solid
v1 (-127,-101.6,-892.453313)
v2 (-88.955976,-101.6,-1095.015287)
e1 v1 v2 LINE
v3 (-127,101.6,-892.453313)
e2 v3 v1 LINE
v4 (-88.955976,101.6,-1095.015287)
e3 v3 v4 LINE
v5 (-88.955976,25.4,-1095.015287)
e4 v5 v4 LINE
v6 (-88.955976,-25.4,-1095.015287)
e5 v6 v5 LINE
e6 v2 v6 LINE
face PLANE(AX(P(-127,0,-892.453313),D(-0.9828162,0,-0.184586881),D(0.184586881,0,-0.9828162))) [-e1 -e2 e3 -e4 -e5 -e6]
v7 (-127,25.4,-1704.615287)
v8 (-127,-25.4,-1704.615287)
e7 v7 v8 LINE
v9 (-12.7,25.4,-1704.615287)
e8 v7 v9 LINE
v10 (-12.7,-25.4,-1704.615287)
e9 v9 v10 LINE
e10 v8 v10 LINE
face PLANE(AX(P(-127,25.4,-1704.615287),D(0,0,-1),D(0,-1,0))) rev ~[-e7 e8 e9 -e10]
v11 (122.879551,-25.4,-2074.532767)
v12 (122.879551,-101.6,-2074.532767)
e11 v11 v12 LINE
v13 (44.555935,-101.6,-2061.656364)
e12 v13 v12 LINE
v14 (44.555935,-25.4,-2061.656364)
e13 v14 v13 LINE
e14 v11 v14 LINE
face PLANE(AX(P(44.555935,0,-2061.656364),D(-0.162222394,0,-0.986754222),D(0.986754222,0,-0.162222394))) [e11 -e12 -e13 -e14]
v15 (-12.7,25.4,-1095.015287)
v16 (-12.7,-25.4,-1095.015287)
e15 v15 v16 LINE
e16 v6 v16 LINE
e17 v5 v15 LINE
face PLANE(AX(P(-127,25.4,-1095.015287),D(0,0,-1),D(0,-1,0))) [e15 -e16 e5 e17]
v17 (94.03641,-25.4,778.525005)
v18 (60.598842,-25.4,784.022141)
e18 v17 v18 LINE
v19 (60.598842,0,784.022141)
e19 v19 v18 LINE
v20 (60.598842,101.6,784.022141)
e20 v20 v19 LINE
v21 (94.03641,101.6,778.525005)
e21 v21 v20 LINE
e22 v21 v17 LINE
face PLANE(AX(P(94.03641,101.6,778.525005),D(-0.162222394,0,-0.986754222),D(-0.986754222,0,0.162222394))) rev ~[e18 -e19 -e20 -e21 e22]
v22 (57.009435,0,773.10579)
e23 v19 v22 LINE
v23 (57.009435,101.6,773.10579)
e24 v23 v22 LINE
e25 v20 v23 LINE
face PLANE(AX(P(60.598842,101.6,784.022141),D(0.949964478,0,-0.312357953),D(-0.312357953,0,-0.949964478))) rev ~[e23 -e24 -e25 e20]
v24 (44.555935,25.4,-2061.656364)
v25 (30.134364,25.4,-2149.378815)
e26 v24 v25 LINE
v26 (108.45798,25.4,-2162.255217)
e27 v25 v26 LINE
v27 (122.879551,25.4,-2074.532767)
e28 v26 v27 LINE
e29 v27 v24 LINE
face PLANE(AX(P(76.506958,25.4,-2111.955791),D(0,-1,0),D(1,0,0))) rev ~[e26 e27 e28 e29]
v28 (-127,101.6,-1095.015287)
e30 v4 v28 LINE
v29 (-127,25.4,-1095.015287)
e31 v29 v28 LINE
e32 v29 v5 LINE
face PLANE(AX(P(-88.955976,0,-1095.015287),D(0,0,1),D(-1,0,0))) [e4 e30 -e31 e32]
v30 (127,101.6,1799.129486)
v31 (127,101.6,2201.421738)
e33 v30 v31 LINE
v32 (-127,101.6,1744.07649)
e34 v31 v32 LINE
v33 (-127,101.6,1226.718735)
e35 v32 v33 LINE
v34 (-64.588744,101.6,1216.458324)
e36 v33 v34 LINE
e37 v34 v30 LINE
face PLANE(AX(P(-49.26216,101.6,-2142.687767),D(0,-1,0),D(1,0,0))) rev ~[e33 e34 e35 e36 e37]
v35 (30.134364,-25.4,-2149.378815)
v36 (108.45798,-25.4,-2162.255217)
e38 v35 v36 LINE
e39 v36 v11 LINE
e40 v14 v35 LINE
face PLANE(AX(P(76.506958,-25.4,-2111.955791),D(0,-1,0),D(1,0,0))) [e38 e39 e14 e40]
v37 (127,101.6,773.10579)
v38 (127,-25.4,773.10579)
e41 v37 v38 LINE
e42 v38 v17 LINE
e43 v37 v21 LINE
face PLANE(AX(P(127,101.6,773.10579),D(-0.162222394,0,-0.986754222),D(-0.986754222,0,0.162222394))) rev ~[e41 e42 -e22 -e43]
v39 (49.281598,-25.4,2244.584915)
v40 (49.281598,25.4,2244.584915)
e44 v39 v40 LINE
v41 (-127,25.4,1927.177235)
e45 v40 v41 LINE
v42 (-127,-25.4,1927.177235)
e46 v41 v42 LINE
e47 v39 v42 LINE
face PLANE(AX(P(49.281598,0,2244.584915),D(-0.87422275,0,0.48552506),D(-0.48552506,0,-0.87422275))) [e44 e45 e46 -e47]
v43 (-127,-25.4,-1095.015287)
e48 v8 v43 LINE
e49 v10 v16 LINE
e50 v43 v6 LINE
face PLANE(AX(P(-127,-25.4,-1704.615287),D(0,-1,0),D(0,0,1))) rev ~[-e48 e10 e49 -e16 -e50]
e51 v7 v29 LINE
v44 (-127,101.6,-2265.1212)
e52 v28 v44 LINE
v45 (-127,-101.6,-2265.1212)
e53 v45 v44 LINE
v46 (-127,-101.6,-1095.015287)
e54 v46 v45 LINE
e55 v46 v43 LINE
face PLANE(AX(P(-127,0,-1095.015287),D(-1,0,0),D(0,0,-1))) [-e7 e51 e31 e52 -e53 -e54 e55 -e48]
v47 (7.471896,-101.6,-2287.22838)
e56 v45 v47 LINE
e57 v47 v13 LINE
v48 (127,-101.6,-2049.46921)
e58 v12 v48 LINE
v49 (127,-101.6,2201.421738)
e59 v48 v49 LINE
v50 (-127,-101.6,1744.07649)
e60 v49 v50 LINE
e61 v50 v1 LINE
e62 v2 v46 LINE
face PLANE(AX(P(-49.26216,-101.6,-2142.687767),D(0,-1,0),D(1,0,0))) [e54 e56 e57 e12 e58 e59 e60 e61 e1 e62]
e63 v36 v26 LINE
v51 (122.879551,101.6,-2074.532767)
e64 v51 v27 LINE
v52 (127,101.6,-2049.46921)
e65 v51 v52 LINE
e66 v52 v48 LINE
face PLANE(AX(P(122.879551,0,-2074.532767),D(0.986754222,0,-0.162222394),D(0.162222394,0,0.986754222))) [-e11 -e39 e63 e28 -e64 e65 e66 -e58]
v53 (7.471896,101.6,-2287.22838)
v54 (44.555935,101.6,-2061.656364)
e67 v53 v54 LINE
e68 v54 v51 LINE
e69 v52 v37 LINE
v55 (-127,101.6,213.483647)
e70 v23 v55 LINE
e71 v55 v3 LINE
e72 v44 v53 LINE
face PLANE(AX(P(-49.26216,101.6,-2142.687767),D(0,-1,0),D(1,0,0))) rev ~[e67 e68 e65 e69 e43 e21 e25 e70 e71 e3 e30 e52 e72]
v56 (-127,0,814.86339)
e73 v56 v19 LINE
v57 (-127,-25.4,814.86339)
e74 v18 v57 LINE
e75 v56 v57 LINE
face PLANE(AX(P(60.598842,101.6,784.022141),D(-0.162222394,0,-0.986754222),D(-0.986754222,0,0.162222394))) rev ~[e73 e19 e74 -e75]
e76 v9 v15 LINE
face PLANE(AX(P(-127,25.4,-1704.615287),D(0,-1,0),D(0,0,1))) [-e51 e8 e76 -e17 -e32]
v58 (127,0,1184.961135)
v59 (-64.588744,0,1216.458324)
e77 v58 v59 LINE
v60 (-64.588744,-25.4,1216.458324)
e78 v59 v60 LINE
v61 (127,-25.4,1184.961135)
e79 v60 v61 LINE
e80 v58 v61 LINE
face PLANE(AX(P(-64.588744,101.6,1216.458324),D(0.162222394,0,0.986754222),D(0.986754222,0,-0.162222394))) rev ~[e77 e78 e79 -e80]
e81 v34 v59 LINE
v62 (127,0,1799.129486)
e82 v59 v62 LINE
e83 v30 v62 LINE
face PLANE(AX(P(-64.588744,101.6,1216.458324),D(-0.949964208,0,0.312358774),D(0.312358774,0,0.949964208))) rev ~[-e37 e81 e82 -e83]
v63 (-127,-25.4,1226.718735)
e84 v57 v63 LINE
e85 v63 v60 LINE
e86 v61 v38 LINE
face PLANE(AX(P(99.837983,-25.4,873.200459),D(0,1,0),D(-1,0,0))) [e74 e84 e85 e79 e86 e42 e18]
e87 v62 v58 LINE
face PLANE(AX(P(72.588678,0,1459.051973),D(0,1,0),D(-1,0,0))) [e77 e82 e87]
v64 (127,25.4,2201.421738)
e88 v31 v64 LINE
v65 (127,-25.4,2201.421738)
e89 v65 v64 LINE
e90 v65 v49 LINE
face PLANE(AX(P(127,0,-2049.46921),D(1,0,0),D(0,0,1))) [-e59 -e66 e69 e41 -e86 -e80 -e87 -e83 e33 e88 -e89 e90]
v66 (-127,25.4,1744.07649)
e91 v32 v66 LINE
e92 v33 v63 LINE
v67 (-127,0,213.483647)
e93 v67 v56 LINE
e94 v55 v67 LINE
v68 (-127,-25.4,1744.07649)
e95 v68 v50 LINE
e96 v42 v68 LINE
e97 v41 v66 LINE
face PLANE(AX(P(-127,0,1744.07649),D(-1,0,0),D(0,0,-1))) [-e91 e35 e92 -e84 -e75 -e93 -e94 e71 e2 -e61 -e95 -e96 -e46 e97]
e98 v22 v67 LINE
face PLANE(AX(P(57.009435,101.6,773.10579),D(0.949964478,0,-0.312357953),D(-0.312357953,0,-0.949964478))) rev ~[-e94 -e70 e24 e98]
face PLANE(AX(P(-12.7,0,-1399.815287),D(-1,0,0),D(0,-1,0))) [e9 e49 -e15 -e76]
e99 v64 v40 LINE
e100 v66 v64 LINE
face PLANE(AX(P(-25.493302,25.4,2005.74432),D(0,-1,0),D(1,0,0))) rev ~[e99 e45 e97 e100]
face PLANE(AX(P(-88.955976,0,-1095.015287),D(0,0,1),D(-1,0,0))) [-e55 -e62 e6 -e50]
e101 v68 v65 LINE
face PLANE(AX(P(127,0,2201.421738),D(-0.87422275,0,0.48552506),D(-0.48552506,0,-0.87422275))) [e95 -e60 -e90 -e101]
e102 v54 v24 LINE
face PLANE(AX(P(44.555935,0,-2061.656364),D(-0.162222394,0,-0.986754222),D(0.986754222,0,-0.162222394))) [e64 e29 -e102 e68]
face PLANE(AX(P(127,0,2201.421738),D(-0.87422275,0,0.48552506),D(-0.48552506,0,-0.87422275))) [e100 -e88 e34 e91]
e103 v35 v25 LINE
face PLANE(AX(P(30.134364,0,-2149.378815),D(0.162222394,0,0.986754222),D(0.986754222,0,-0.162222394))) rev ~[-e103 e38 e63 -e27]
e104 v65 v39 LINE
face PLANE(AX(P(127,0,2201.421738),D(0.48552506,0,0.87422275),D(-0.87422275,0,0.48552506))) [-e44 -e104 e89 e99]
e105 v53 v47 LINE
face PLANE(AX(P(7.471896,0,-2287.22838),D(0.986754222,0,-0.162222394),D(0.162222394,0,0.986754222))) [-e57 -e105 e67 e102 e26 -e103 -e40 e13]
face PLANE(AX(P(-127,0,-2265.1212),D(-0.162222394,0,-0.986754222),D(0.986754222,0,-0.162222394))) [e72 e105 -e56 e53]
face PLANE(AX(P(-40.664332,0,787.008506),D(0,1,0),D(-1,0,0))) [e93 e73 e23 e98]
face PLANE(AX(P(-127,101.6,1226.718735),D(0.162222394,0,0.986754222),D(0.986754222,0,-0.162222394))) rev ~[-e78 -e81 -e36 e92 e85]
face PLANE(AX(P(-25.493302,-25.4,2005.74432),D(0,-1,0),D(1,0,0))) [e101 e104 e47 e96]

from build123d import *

# Parameters (mm, degrees)
F1_DEPTH = 101.6
F2_DEPTH = 25.4
F4_DEPTH = 127
F5_DEPTH = 101.6
F6_W     = 50.8
F6_H     = 609.6
F7_DEPTH = 114.3


# Not quite as in the source:
# - a feature names something its author has since deleted; it is built from what else it names


with BuildPart() as f1:
    # F0 (on Front) → F1 (new body, symmetric)
    with BuildSketch(Plane.XZ):
        Polygon((48.6763836202, -2036.5928072073), (-127, -2007.7116097401), (-127, -2265.1212), (7.4718955151, -2287.2283796227), (30.1343639729, -2149.3788147942), (44.5559348097, -2061.6563644488), align=None)
        Polygon((122.8795511895, -2074.5327669817), (127, -2049.4692097401), (48.6763836202, -2036.5928072073), (44.5559348097, -2061.6563644488), align=None)
        Polygon((127, -2049.4692097401), (127, -1560.1717829992), (48.6763836202, -2036.5928072073), align=None)
        Polygon((127, 2201.4217376709), (-127, 1744.0764904022), (-127, -892.4533128738), (-88.955976069, -1095.0152873993), (-127, -1095.0152873993), (-127, -2007.7116097401), (48.6763836202, -2036.5928072073), (127, -1560.1717829992), (127, 1433.3240232688), align=None)
    extrude(amount=F1_DEPTH, both=True)

    # F0 (on Front) → F2 (join, symmetric)
    with BuildSketch(Plane.XZ):
        Polygon((108.4579803527, -2162.2552173271), (122.8795511895, -2074.5327669817), (44.5559348097, -2061.6563644488), (30.1343639729, -2149.3788147942), align=None)
        Polygon((49.2815975347, 2244.584915476), (-127, 1927.1772351083), (-127, 1744.0764904022), (127, 2201.4217376709), align=None)
    extrude(amount=F2_DEPTH, both=True)

    # F3 (on face) → F4 (cut)
    with BuildSketch(Plane(origin=(0, 101.6, 0), x_dir=(-1, 0, 0), z_dir=(0, 1, 0))):
        Polygon((-127, 979.0334624678), (-94.0364095159, 778.5250045355), (-60.5988418361, 784.022140662), (-124.8374418386, 979.3889870295), align=None)
        Polygon((-127, 979.0334624678), (-127, 773.1057902599), (-94.0364095159, 778.5250045355), align=None)
        Polygon((-124.8374418386, 979.3889870295), (-60.5988418361, 784.022140662), (127, 814.8633902599), (127, 1020.7910624678), align=None)
        Polygon((64.588744063, 1216.4583241996), (127, 1026.6494750977), (127, 1226.7187346757), align=None)
        Polygon((-127, 985.9659075737), (-127, 979.0334624678), (-124.8374418386, 979.3889870295), align=None)
        Polygon((-127, 985.9659075737), (-124.8374418386, 979.3889870295), (127, 1020.7910624678), (127, 1026.6494750977), (64.588744063, 1216.4583241996), (-127, 1184.9611346757), align=None)
    extrude(amount=-F4_DEPTH, mode=Mode.SUBTRACT)

    # F3 (on face) → F5 (cut)
    with BuildSketch(Plane(origin=(0, 101.6, 0), x_dir=(-1, 0, 0), z_dir=(0, 1, 0))):
        Polygon((-60.5988418361, 784.022140662), (-57.0094351378, 773.1057902599), (127, 773.1057902599), (127, 814.8633902599), align=None)
        Polygon((127, 773.1057902599), (-57.0094351378, 773.1057902599), (127, 213.483646512), align=None)
        Polygon((-127, 1799.129486084), (-127, 1184.9611346757), (64.588744063, 1216.4583241996), align=None)
    extrude(amount=-F5_DEPTH, mode=Mode.SUBTRACT)

    # F6 (on face) → F7 (cut)
    with BuildSketch(Plane(origin=(-127, 0, 0), x_dir=(0, -1, 0), z_dir=(-1, 0, 0))):
        with Locations((0, -1399.8152873993)):
            Rectangle(F6_W, F6_H)
    extrude(amount=-F7_DEPTH, mode=Mode.SUBTRACT)


solid = f1.part
